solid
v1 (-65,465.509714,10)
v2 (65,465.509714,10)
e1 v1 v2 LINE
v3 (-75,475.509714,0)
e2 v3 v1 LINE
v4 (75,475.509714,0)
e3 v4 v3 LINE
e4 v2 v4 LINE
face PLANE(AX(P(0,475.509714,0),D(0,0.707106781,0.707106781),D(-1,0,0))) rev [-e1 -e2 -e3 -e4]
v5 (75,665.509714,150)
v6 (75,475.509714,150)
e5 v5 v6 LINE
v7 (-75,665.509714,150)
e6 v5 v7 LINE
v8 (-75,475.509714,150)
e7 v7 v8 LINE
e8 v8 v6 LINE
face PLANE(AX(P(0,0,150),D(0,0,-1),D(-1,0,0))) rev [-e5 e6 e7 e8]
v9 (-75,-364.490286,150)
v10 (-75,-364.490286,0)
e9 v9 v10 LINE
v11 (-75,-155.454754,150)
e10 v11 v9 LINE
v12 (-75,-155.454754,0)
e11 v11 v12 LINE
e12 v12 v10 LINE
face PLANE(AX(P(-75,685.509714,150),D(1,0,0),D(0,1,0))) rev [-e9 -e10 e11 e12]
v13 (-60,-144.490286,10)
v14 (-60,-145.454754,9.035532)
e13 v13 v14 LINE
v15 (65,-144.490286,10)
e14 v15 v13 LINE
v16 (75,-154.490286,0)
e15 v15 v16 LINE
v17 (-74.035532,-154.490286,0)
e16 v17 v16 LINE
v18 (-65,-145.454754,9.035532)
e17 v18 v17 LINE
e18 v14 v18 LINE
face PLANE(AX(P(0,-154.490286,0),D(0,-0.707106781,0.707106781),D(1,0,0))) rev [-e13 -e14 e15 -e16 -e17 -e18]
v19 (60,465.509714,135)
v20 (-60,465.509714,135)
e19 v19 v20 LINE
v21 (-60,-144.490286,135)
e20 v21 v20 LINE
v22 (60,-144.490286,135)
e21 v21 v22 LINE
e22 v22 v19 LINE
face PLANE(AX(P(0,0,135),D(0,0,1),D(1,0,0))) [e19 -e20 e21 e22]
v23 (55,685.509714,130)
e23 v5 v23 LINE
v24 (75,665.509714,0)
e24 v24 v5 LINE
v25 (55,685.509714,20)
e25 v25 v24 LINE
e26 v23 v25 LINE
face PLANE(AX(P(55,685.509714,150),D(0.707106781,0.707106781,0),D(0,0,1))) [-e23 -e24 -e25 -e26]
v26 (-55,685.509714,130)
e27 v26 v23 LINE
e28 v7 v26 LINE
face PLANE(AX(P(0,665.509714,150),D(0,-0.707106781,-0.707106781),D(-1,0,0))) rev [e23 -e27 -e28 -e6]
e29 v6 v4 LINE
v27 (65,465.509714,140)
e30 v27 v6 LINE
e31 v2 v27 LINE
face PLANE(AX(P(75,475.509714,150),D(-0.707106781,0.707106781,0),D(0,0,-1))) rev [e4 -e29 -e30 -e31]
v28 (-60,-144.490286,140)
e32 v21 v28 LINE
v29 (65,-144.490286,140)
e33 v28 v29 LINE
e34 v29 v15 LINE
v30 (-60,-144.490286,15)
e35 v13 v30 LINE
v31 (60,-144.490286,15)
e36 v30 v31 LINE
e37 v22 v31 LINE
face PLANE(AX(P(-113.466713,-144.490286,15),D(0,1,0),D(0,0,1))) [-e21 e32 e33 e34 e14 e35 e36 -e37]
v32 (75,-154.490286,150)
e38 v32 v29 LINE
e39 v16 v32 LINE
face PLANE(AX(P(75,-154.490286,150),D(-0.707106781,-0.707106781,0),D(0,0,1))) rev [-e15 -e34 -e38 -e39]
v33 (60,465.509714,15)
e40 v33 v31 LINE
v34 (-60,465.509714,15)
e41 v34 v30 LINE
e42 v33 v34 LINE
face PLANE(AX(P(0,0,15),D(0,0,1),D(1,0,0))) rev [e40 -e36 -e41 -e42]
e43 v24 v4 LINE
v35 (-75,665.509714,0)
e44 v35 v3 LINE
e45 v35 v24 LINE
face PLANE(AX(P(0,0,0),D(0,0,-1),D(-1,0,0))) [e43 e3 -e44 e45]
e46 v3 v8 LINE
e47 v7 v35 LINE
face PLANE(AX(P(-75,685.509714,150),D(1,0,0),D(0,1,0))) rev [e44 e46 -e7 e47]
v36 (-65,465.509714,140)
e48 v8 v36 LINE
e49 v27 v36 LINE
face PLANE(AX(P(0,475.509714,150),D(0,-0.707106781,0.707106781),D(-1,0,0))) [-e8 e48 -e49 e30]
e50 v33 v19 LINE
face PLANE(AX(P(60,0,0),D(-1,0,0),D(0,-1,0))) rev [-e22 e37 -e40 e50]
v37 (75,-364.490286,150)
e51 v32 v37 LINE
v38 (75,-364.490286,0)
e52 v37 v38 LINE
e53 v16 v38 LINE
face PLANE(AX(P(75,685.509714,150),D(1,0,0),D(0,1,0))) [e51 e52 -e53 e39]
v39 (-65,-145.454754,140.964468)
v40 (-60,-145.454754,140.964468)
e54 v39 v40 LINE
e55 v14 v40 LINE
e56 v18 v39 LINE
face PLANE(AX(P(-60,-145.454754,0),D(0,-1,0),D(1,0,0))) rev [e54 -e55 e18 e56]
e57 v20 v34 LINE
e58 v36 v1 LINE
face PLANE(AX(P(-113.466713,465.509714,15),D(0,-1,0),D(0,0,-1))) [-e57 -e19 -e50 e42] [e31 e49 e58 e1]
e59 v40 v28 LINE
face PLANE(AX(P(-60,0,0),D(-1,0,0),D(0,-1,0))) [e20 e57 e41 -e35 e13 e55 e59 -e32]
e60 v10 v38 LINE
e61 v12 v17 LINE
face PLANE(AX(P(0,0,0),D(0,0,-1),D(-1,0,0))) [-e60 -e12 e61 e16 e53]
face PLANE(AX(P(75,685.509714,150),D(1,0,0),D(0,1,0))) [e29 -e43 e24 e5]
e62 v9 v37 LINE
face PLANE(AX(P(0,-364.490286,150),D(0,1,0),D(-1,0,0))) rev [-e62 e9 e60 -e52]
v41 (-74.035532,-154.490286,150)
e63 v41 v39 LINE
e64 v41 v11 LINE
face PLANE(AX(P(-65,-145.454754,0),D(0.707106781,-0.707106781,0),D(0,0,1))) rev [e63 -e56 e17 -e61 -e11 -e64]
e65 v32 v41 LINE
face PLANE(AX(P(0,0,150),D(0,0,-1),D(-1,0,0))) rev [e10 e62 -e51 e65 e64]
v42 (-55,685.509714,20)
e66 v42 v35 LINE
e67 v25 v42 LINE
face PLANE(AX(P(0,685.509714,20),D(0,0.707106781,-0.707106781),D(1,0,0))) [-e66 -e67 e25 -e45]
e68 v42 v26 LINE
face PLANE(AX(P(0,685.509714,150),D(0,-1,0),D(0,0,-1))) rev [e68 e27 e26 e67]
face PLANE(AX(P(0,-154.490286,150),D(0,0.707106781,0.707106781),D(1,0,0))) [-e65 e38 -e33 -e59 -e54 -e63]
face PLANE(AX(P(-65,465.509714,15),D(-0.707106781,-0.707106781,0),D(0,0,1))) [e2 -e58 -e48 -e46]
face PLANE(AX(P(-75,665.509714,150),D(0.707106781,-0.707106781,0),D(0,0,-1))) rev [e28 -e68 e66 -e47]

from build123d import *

# Parameters (mm, degrees)
ESQUISSE1_W             = 75
ESQUISSE1_H             = 1050
BOSS_EXTRU_2_DEPTH      = 150
ESQUISSE2_W             = 226.933426854
ESQUISSE2_H             = 610
ENL_V_MAT_EXTRU_1_DEPTH = 15
ESQUISSE3_W             = 179.782352086
ESQUISSE3_H             = 610.96446809
ENL_V_MAT_EXTRU_2_DEPTH = 15
ESQUISSE4_W             = 199.341724475
ESQUISSE4_H             = 610
ENL_V_MAT_EXTRU_3_DEPTH = 15
ESQUISSE5_W             = 150
ESQUISSE5_H             = 610
ENL_V_MAT_EXTRU_4_DEPTH = 15
CHANFREIN1_SIZE         = 20
CHANFREIN2_SIZE         = 10
CHANFREIN3_SIZE         = 10


with BuildPart() as part:
    # Esquisse1 → Boss.-Extru.2 (new body)
    with BuildSketch(Plane.XY):
        with Locations((-37.5, 160.509714461)):
            Rectangle(ESQUISSE1_W, ESQUISSE1_H)
    boss_extru_2 = extrude(amount=BOSS_EXTRU_2_DEPTH)

    # Symétrie1: Boss.-Extru.2 across plane
    add(boss_extru_2.mirror(Plane(origin=(0, 685.509714461, 150), x_dir=(0, 0, 1), z_dir=(-1, 0, 0))))

    # Esquisse2 → Enlèv. mat.-Extru.1 (cut)
    with BuildSketch(Plane.XY):
        with Locations((0, 160.509714461)):
            Rectangle(ESQUISSE2_W, ESQUISSE2_H)
    extrude(amount=ENL_V_MAT_EXTRU_1_DEPTH, mode=Mode.SUBTRACT)

    # Esquisse3 → Enlèv. mat.-Extru.2 (cut)
    with BuildSketch(Plane.ZY.offset(75)):
        with Locations((89.891176043, 160.027480416)):
            Rectangle(ESQUISSE3_W, ESQUISSE3_H)
    extrude(amount=-ENL_V_MAT_EXTRU_2_DEPTH, mode=Mode.SUBTRACT)

    # Esquisse4 → Enlèv. mat.-Extru.3 (cut)
    with BuildSketch(Plane(origin=(75, 0, 0), x_dir=(0, 0, -1), z_dir=(1, 0, 0))):
        with Locations((-99.670862238, 160.509714461)):
            Rectangle(ESQUISSE4_W, ESQUISSE4_H)
    extrude(amount=-ENL_V_MAT_EXTRU_3_DEPTH, mode=Mode.SUBTRACT)

    # Esquisse5 → Enlèv. mat.-Extru.4 (cut)
    with BuildSketch(Plane.XY.offset(150)):
        with Locations((0, 160.509714461)):
            Rectangle(ESQUISSE5_W, ESQUISSE5_H)
    extrude(amount=-ENL_V_MAT_EXTRU_4_DEPTH, mode=Mode.SUBTRACT)

    # Chanfrein1
    chanfrein1_edges = [part.edges().sort_by_distance(p)[0] for p in [
        (75, 685.509714461, 75),
        (0, 685.509714461, 0),
        (0, 685.509714461, 150),
        (-75, 685.509714461, 75),
    ]]
    chamfer(chanfrein1_edges, length=CHANFREIN1_SIZE)

    # Chanfrein2
    chanfrein2_edges = [part.edges().sort_by_distance(p)[0] for p in [
        (75, 465.509714461, 75),
        (0, 465.509714461, 0),
        (-75, 465.509714461, 75),
        (0, 465.509714461, 150),
    ]]
    chamfer(chanfrein2_edges, length=CHANFREIN2_SIZE)

    # Chanfrein3
    # the kernel refuses this chamfer: 10 mm, written as the material it takes off along each edge
    with BuildSketch(Plane(origin=(-75, -145.454753629, 175.71682988), x_dir=(0.9996219169112968, 0.0274958766105877, 0), z_dir=(0, 0, -1))) as chanfrein3_piece_1:
        Polygon((CHANFREIN3_SIZE * 0.999621916911, CHANFREIN3_SIZE * 0.0274958766106), (-CHANFREIN3_SIZE * 0.0274958766106, CHANFREIN3_SIZE * 0.999621916911), (0, 0), align=None)
    extrude(amount=201.433659759, mode=Mode.SUBTRACT)
    with BuildSketch(Plane(origin=(-85.71682988, -144.490285539, 150), x_dir=(0, 0.027495876610587663, -0.9996219169112968), z_dir=(1, 0, 0)), Plane(origin=(100.71682988, -144.490285539, 0), x_dir=(0, 0.0274958766105877, 0.9996219169112968), z_dir=(-1, 0, 0))) as chanfrein3_piece_2:
        Polygon((CHANFREIN3_SIZE * 0.999621916911, -CHANFREIN3_SIZE * 0.0274958766106), (-CHANFREIN3_SIZE * 0.0274958766106, -CHANFREIN3_SIZE * 0.999621916911), (0, 0), align=None)
    extrude(amount=186.433659759, mode=Mode.SUBTRACT)
    with BuildSketch(Plane(origin=(75, -144.490285539, 175.71682988), x_dir=(-0.9996219169112968, 0.0274958766105877, 0), z_dir=(0, 0, -1))) as chanfrein3_piece_3:
        Polygon((CHANFREIN3_SIZE * 0.999621916911, -CHANFREIN3_SIZE * 0.0274958766106), (-CHANFREIN3_SIZE * 0.0274958766106, -CHANFREIN3_SIZE * 0.999621916911), (0, 0), align=None)
    extrude(amount=201.433659759, mode=Mode.SUBTRACT)


solid = part.part
